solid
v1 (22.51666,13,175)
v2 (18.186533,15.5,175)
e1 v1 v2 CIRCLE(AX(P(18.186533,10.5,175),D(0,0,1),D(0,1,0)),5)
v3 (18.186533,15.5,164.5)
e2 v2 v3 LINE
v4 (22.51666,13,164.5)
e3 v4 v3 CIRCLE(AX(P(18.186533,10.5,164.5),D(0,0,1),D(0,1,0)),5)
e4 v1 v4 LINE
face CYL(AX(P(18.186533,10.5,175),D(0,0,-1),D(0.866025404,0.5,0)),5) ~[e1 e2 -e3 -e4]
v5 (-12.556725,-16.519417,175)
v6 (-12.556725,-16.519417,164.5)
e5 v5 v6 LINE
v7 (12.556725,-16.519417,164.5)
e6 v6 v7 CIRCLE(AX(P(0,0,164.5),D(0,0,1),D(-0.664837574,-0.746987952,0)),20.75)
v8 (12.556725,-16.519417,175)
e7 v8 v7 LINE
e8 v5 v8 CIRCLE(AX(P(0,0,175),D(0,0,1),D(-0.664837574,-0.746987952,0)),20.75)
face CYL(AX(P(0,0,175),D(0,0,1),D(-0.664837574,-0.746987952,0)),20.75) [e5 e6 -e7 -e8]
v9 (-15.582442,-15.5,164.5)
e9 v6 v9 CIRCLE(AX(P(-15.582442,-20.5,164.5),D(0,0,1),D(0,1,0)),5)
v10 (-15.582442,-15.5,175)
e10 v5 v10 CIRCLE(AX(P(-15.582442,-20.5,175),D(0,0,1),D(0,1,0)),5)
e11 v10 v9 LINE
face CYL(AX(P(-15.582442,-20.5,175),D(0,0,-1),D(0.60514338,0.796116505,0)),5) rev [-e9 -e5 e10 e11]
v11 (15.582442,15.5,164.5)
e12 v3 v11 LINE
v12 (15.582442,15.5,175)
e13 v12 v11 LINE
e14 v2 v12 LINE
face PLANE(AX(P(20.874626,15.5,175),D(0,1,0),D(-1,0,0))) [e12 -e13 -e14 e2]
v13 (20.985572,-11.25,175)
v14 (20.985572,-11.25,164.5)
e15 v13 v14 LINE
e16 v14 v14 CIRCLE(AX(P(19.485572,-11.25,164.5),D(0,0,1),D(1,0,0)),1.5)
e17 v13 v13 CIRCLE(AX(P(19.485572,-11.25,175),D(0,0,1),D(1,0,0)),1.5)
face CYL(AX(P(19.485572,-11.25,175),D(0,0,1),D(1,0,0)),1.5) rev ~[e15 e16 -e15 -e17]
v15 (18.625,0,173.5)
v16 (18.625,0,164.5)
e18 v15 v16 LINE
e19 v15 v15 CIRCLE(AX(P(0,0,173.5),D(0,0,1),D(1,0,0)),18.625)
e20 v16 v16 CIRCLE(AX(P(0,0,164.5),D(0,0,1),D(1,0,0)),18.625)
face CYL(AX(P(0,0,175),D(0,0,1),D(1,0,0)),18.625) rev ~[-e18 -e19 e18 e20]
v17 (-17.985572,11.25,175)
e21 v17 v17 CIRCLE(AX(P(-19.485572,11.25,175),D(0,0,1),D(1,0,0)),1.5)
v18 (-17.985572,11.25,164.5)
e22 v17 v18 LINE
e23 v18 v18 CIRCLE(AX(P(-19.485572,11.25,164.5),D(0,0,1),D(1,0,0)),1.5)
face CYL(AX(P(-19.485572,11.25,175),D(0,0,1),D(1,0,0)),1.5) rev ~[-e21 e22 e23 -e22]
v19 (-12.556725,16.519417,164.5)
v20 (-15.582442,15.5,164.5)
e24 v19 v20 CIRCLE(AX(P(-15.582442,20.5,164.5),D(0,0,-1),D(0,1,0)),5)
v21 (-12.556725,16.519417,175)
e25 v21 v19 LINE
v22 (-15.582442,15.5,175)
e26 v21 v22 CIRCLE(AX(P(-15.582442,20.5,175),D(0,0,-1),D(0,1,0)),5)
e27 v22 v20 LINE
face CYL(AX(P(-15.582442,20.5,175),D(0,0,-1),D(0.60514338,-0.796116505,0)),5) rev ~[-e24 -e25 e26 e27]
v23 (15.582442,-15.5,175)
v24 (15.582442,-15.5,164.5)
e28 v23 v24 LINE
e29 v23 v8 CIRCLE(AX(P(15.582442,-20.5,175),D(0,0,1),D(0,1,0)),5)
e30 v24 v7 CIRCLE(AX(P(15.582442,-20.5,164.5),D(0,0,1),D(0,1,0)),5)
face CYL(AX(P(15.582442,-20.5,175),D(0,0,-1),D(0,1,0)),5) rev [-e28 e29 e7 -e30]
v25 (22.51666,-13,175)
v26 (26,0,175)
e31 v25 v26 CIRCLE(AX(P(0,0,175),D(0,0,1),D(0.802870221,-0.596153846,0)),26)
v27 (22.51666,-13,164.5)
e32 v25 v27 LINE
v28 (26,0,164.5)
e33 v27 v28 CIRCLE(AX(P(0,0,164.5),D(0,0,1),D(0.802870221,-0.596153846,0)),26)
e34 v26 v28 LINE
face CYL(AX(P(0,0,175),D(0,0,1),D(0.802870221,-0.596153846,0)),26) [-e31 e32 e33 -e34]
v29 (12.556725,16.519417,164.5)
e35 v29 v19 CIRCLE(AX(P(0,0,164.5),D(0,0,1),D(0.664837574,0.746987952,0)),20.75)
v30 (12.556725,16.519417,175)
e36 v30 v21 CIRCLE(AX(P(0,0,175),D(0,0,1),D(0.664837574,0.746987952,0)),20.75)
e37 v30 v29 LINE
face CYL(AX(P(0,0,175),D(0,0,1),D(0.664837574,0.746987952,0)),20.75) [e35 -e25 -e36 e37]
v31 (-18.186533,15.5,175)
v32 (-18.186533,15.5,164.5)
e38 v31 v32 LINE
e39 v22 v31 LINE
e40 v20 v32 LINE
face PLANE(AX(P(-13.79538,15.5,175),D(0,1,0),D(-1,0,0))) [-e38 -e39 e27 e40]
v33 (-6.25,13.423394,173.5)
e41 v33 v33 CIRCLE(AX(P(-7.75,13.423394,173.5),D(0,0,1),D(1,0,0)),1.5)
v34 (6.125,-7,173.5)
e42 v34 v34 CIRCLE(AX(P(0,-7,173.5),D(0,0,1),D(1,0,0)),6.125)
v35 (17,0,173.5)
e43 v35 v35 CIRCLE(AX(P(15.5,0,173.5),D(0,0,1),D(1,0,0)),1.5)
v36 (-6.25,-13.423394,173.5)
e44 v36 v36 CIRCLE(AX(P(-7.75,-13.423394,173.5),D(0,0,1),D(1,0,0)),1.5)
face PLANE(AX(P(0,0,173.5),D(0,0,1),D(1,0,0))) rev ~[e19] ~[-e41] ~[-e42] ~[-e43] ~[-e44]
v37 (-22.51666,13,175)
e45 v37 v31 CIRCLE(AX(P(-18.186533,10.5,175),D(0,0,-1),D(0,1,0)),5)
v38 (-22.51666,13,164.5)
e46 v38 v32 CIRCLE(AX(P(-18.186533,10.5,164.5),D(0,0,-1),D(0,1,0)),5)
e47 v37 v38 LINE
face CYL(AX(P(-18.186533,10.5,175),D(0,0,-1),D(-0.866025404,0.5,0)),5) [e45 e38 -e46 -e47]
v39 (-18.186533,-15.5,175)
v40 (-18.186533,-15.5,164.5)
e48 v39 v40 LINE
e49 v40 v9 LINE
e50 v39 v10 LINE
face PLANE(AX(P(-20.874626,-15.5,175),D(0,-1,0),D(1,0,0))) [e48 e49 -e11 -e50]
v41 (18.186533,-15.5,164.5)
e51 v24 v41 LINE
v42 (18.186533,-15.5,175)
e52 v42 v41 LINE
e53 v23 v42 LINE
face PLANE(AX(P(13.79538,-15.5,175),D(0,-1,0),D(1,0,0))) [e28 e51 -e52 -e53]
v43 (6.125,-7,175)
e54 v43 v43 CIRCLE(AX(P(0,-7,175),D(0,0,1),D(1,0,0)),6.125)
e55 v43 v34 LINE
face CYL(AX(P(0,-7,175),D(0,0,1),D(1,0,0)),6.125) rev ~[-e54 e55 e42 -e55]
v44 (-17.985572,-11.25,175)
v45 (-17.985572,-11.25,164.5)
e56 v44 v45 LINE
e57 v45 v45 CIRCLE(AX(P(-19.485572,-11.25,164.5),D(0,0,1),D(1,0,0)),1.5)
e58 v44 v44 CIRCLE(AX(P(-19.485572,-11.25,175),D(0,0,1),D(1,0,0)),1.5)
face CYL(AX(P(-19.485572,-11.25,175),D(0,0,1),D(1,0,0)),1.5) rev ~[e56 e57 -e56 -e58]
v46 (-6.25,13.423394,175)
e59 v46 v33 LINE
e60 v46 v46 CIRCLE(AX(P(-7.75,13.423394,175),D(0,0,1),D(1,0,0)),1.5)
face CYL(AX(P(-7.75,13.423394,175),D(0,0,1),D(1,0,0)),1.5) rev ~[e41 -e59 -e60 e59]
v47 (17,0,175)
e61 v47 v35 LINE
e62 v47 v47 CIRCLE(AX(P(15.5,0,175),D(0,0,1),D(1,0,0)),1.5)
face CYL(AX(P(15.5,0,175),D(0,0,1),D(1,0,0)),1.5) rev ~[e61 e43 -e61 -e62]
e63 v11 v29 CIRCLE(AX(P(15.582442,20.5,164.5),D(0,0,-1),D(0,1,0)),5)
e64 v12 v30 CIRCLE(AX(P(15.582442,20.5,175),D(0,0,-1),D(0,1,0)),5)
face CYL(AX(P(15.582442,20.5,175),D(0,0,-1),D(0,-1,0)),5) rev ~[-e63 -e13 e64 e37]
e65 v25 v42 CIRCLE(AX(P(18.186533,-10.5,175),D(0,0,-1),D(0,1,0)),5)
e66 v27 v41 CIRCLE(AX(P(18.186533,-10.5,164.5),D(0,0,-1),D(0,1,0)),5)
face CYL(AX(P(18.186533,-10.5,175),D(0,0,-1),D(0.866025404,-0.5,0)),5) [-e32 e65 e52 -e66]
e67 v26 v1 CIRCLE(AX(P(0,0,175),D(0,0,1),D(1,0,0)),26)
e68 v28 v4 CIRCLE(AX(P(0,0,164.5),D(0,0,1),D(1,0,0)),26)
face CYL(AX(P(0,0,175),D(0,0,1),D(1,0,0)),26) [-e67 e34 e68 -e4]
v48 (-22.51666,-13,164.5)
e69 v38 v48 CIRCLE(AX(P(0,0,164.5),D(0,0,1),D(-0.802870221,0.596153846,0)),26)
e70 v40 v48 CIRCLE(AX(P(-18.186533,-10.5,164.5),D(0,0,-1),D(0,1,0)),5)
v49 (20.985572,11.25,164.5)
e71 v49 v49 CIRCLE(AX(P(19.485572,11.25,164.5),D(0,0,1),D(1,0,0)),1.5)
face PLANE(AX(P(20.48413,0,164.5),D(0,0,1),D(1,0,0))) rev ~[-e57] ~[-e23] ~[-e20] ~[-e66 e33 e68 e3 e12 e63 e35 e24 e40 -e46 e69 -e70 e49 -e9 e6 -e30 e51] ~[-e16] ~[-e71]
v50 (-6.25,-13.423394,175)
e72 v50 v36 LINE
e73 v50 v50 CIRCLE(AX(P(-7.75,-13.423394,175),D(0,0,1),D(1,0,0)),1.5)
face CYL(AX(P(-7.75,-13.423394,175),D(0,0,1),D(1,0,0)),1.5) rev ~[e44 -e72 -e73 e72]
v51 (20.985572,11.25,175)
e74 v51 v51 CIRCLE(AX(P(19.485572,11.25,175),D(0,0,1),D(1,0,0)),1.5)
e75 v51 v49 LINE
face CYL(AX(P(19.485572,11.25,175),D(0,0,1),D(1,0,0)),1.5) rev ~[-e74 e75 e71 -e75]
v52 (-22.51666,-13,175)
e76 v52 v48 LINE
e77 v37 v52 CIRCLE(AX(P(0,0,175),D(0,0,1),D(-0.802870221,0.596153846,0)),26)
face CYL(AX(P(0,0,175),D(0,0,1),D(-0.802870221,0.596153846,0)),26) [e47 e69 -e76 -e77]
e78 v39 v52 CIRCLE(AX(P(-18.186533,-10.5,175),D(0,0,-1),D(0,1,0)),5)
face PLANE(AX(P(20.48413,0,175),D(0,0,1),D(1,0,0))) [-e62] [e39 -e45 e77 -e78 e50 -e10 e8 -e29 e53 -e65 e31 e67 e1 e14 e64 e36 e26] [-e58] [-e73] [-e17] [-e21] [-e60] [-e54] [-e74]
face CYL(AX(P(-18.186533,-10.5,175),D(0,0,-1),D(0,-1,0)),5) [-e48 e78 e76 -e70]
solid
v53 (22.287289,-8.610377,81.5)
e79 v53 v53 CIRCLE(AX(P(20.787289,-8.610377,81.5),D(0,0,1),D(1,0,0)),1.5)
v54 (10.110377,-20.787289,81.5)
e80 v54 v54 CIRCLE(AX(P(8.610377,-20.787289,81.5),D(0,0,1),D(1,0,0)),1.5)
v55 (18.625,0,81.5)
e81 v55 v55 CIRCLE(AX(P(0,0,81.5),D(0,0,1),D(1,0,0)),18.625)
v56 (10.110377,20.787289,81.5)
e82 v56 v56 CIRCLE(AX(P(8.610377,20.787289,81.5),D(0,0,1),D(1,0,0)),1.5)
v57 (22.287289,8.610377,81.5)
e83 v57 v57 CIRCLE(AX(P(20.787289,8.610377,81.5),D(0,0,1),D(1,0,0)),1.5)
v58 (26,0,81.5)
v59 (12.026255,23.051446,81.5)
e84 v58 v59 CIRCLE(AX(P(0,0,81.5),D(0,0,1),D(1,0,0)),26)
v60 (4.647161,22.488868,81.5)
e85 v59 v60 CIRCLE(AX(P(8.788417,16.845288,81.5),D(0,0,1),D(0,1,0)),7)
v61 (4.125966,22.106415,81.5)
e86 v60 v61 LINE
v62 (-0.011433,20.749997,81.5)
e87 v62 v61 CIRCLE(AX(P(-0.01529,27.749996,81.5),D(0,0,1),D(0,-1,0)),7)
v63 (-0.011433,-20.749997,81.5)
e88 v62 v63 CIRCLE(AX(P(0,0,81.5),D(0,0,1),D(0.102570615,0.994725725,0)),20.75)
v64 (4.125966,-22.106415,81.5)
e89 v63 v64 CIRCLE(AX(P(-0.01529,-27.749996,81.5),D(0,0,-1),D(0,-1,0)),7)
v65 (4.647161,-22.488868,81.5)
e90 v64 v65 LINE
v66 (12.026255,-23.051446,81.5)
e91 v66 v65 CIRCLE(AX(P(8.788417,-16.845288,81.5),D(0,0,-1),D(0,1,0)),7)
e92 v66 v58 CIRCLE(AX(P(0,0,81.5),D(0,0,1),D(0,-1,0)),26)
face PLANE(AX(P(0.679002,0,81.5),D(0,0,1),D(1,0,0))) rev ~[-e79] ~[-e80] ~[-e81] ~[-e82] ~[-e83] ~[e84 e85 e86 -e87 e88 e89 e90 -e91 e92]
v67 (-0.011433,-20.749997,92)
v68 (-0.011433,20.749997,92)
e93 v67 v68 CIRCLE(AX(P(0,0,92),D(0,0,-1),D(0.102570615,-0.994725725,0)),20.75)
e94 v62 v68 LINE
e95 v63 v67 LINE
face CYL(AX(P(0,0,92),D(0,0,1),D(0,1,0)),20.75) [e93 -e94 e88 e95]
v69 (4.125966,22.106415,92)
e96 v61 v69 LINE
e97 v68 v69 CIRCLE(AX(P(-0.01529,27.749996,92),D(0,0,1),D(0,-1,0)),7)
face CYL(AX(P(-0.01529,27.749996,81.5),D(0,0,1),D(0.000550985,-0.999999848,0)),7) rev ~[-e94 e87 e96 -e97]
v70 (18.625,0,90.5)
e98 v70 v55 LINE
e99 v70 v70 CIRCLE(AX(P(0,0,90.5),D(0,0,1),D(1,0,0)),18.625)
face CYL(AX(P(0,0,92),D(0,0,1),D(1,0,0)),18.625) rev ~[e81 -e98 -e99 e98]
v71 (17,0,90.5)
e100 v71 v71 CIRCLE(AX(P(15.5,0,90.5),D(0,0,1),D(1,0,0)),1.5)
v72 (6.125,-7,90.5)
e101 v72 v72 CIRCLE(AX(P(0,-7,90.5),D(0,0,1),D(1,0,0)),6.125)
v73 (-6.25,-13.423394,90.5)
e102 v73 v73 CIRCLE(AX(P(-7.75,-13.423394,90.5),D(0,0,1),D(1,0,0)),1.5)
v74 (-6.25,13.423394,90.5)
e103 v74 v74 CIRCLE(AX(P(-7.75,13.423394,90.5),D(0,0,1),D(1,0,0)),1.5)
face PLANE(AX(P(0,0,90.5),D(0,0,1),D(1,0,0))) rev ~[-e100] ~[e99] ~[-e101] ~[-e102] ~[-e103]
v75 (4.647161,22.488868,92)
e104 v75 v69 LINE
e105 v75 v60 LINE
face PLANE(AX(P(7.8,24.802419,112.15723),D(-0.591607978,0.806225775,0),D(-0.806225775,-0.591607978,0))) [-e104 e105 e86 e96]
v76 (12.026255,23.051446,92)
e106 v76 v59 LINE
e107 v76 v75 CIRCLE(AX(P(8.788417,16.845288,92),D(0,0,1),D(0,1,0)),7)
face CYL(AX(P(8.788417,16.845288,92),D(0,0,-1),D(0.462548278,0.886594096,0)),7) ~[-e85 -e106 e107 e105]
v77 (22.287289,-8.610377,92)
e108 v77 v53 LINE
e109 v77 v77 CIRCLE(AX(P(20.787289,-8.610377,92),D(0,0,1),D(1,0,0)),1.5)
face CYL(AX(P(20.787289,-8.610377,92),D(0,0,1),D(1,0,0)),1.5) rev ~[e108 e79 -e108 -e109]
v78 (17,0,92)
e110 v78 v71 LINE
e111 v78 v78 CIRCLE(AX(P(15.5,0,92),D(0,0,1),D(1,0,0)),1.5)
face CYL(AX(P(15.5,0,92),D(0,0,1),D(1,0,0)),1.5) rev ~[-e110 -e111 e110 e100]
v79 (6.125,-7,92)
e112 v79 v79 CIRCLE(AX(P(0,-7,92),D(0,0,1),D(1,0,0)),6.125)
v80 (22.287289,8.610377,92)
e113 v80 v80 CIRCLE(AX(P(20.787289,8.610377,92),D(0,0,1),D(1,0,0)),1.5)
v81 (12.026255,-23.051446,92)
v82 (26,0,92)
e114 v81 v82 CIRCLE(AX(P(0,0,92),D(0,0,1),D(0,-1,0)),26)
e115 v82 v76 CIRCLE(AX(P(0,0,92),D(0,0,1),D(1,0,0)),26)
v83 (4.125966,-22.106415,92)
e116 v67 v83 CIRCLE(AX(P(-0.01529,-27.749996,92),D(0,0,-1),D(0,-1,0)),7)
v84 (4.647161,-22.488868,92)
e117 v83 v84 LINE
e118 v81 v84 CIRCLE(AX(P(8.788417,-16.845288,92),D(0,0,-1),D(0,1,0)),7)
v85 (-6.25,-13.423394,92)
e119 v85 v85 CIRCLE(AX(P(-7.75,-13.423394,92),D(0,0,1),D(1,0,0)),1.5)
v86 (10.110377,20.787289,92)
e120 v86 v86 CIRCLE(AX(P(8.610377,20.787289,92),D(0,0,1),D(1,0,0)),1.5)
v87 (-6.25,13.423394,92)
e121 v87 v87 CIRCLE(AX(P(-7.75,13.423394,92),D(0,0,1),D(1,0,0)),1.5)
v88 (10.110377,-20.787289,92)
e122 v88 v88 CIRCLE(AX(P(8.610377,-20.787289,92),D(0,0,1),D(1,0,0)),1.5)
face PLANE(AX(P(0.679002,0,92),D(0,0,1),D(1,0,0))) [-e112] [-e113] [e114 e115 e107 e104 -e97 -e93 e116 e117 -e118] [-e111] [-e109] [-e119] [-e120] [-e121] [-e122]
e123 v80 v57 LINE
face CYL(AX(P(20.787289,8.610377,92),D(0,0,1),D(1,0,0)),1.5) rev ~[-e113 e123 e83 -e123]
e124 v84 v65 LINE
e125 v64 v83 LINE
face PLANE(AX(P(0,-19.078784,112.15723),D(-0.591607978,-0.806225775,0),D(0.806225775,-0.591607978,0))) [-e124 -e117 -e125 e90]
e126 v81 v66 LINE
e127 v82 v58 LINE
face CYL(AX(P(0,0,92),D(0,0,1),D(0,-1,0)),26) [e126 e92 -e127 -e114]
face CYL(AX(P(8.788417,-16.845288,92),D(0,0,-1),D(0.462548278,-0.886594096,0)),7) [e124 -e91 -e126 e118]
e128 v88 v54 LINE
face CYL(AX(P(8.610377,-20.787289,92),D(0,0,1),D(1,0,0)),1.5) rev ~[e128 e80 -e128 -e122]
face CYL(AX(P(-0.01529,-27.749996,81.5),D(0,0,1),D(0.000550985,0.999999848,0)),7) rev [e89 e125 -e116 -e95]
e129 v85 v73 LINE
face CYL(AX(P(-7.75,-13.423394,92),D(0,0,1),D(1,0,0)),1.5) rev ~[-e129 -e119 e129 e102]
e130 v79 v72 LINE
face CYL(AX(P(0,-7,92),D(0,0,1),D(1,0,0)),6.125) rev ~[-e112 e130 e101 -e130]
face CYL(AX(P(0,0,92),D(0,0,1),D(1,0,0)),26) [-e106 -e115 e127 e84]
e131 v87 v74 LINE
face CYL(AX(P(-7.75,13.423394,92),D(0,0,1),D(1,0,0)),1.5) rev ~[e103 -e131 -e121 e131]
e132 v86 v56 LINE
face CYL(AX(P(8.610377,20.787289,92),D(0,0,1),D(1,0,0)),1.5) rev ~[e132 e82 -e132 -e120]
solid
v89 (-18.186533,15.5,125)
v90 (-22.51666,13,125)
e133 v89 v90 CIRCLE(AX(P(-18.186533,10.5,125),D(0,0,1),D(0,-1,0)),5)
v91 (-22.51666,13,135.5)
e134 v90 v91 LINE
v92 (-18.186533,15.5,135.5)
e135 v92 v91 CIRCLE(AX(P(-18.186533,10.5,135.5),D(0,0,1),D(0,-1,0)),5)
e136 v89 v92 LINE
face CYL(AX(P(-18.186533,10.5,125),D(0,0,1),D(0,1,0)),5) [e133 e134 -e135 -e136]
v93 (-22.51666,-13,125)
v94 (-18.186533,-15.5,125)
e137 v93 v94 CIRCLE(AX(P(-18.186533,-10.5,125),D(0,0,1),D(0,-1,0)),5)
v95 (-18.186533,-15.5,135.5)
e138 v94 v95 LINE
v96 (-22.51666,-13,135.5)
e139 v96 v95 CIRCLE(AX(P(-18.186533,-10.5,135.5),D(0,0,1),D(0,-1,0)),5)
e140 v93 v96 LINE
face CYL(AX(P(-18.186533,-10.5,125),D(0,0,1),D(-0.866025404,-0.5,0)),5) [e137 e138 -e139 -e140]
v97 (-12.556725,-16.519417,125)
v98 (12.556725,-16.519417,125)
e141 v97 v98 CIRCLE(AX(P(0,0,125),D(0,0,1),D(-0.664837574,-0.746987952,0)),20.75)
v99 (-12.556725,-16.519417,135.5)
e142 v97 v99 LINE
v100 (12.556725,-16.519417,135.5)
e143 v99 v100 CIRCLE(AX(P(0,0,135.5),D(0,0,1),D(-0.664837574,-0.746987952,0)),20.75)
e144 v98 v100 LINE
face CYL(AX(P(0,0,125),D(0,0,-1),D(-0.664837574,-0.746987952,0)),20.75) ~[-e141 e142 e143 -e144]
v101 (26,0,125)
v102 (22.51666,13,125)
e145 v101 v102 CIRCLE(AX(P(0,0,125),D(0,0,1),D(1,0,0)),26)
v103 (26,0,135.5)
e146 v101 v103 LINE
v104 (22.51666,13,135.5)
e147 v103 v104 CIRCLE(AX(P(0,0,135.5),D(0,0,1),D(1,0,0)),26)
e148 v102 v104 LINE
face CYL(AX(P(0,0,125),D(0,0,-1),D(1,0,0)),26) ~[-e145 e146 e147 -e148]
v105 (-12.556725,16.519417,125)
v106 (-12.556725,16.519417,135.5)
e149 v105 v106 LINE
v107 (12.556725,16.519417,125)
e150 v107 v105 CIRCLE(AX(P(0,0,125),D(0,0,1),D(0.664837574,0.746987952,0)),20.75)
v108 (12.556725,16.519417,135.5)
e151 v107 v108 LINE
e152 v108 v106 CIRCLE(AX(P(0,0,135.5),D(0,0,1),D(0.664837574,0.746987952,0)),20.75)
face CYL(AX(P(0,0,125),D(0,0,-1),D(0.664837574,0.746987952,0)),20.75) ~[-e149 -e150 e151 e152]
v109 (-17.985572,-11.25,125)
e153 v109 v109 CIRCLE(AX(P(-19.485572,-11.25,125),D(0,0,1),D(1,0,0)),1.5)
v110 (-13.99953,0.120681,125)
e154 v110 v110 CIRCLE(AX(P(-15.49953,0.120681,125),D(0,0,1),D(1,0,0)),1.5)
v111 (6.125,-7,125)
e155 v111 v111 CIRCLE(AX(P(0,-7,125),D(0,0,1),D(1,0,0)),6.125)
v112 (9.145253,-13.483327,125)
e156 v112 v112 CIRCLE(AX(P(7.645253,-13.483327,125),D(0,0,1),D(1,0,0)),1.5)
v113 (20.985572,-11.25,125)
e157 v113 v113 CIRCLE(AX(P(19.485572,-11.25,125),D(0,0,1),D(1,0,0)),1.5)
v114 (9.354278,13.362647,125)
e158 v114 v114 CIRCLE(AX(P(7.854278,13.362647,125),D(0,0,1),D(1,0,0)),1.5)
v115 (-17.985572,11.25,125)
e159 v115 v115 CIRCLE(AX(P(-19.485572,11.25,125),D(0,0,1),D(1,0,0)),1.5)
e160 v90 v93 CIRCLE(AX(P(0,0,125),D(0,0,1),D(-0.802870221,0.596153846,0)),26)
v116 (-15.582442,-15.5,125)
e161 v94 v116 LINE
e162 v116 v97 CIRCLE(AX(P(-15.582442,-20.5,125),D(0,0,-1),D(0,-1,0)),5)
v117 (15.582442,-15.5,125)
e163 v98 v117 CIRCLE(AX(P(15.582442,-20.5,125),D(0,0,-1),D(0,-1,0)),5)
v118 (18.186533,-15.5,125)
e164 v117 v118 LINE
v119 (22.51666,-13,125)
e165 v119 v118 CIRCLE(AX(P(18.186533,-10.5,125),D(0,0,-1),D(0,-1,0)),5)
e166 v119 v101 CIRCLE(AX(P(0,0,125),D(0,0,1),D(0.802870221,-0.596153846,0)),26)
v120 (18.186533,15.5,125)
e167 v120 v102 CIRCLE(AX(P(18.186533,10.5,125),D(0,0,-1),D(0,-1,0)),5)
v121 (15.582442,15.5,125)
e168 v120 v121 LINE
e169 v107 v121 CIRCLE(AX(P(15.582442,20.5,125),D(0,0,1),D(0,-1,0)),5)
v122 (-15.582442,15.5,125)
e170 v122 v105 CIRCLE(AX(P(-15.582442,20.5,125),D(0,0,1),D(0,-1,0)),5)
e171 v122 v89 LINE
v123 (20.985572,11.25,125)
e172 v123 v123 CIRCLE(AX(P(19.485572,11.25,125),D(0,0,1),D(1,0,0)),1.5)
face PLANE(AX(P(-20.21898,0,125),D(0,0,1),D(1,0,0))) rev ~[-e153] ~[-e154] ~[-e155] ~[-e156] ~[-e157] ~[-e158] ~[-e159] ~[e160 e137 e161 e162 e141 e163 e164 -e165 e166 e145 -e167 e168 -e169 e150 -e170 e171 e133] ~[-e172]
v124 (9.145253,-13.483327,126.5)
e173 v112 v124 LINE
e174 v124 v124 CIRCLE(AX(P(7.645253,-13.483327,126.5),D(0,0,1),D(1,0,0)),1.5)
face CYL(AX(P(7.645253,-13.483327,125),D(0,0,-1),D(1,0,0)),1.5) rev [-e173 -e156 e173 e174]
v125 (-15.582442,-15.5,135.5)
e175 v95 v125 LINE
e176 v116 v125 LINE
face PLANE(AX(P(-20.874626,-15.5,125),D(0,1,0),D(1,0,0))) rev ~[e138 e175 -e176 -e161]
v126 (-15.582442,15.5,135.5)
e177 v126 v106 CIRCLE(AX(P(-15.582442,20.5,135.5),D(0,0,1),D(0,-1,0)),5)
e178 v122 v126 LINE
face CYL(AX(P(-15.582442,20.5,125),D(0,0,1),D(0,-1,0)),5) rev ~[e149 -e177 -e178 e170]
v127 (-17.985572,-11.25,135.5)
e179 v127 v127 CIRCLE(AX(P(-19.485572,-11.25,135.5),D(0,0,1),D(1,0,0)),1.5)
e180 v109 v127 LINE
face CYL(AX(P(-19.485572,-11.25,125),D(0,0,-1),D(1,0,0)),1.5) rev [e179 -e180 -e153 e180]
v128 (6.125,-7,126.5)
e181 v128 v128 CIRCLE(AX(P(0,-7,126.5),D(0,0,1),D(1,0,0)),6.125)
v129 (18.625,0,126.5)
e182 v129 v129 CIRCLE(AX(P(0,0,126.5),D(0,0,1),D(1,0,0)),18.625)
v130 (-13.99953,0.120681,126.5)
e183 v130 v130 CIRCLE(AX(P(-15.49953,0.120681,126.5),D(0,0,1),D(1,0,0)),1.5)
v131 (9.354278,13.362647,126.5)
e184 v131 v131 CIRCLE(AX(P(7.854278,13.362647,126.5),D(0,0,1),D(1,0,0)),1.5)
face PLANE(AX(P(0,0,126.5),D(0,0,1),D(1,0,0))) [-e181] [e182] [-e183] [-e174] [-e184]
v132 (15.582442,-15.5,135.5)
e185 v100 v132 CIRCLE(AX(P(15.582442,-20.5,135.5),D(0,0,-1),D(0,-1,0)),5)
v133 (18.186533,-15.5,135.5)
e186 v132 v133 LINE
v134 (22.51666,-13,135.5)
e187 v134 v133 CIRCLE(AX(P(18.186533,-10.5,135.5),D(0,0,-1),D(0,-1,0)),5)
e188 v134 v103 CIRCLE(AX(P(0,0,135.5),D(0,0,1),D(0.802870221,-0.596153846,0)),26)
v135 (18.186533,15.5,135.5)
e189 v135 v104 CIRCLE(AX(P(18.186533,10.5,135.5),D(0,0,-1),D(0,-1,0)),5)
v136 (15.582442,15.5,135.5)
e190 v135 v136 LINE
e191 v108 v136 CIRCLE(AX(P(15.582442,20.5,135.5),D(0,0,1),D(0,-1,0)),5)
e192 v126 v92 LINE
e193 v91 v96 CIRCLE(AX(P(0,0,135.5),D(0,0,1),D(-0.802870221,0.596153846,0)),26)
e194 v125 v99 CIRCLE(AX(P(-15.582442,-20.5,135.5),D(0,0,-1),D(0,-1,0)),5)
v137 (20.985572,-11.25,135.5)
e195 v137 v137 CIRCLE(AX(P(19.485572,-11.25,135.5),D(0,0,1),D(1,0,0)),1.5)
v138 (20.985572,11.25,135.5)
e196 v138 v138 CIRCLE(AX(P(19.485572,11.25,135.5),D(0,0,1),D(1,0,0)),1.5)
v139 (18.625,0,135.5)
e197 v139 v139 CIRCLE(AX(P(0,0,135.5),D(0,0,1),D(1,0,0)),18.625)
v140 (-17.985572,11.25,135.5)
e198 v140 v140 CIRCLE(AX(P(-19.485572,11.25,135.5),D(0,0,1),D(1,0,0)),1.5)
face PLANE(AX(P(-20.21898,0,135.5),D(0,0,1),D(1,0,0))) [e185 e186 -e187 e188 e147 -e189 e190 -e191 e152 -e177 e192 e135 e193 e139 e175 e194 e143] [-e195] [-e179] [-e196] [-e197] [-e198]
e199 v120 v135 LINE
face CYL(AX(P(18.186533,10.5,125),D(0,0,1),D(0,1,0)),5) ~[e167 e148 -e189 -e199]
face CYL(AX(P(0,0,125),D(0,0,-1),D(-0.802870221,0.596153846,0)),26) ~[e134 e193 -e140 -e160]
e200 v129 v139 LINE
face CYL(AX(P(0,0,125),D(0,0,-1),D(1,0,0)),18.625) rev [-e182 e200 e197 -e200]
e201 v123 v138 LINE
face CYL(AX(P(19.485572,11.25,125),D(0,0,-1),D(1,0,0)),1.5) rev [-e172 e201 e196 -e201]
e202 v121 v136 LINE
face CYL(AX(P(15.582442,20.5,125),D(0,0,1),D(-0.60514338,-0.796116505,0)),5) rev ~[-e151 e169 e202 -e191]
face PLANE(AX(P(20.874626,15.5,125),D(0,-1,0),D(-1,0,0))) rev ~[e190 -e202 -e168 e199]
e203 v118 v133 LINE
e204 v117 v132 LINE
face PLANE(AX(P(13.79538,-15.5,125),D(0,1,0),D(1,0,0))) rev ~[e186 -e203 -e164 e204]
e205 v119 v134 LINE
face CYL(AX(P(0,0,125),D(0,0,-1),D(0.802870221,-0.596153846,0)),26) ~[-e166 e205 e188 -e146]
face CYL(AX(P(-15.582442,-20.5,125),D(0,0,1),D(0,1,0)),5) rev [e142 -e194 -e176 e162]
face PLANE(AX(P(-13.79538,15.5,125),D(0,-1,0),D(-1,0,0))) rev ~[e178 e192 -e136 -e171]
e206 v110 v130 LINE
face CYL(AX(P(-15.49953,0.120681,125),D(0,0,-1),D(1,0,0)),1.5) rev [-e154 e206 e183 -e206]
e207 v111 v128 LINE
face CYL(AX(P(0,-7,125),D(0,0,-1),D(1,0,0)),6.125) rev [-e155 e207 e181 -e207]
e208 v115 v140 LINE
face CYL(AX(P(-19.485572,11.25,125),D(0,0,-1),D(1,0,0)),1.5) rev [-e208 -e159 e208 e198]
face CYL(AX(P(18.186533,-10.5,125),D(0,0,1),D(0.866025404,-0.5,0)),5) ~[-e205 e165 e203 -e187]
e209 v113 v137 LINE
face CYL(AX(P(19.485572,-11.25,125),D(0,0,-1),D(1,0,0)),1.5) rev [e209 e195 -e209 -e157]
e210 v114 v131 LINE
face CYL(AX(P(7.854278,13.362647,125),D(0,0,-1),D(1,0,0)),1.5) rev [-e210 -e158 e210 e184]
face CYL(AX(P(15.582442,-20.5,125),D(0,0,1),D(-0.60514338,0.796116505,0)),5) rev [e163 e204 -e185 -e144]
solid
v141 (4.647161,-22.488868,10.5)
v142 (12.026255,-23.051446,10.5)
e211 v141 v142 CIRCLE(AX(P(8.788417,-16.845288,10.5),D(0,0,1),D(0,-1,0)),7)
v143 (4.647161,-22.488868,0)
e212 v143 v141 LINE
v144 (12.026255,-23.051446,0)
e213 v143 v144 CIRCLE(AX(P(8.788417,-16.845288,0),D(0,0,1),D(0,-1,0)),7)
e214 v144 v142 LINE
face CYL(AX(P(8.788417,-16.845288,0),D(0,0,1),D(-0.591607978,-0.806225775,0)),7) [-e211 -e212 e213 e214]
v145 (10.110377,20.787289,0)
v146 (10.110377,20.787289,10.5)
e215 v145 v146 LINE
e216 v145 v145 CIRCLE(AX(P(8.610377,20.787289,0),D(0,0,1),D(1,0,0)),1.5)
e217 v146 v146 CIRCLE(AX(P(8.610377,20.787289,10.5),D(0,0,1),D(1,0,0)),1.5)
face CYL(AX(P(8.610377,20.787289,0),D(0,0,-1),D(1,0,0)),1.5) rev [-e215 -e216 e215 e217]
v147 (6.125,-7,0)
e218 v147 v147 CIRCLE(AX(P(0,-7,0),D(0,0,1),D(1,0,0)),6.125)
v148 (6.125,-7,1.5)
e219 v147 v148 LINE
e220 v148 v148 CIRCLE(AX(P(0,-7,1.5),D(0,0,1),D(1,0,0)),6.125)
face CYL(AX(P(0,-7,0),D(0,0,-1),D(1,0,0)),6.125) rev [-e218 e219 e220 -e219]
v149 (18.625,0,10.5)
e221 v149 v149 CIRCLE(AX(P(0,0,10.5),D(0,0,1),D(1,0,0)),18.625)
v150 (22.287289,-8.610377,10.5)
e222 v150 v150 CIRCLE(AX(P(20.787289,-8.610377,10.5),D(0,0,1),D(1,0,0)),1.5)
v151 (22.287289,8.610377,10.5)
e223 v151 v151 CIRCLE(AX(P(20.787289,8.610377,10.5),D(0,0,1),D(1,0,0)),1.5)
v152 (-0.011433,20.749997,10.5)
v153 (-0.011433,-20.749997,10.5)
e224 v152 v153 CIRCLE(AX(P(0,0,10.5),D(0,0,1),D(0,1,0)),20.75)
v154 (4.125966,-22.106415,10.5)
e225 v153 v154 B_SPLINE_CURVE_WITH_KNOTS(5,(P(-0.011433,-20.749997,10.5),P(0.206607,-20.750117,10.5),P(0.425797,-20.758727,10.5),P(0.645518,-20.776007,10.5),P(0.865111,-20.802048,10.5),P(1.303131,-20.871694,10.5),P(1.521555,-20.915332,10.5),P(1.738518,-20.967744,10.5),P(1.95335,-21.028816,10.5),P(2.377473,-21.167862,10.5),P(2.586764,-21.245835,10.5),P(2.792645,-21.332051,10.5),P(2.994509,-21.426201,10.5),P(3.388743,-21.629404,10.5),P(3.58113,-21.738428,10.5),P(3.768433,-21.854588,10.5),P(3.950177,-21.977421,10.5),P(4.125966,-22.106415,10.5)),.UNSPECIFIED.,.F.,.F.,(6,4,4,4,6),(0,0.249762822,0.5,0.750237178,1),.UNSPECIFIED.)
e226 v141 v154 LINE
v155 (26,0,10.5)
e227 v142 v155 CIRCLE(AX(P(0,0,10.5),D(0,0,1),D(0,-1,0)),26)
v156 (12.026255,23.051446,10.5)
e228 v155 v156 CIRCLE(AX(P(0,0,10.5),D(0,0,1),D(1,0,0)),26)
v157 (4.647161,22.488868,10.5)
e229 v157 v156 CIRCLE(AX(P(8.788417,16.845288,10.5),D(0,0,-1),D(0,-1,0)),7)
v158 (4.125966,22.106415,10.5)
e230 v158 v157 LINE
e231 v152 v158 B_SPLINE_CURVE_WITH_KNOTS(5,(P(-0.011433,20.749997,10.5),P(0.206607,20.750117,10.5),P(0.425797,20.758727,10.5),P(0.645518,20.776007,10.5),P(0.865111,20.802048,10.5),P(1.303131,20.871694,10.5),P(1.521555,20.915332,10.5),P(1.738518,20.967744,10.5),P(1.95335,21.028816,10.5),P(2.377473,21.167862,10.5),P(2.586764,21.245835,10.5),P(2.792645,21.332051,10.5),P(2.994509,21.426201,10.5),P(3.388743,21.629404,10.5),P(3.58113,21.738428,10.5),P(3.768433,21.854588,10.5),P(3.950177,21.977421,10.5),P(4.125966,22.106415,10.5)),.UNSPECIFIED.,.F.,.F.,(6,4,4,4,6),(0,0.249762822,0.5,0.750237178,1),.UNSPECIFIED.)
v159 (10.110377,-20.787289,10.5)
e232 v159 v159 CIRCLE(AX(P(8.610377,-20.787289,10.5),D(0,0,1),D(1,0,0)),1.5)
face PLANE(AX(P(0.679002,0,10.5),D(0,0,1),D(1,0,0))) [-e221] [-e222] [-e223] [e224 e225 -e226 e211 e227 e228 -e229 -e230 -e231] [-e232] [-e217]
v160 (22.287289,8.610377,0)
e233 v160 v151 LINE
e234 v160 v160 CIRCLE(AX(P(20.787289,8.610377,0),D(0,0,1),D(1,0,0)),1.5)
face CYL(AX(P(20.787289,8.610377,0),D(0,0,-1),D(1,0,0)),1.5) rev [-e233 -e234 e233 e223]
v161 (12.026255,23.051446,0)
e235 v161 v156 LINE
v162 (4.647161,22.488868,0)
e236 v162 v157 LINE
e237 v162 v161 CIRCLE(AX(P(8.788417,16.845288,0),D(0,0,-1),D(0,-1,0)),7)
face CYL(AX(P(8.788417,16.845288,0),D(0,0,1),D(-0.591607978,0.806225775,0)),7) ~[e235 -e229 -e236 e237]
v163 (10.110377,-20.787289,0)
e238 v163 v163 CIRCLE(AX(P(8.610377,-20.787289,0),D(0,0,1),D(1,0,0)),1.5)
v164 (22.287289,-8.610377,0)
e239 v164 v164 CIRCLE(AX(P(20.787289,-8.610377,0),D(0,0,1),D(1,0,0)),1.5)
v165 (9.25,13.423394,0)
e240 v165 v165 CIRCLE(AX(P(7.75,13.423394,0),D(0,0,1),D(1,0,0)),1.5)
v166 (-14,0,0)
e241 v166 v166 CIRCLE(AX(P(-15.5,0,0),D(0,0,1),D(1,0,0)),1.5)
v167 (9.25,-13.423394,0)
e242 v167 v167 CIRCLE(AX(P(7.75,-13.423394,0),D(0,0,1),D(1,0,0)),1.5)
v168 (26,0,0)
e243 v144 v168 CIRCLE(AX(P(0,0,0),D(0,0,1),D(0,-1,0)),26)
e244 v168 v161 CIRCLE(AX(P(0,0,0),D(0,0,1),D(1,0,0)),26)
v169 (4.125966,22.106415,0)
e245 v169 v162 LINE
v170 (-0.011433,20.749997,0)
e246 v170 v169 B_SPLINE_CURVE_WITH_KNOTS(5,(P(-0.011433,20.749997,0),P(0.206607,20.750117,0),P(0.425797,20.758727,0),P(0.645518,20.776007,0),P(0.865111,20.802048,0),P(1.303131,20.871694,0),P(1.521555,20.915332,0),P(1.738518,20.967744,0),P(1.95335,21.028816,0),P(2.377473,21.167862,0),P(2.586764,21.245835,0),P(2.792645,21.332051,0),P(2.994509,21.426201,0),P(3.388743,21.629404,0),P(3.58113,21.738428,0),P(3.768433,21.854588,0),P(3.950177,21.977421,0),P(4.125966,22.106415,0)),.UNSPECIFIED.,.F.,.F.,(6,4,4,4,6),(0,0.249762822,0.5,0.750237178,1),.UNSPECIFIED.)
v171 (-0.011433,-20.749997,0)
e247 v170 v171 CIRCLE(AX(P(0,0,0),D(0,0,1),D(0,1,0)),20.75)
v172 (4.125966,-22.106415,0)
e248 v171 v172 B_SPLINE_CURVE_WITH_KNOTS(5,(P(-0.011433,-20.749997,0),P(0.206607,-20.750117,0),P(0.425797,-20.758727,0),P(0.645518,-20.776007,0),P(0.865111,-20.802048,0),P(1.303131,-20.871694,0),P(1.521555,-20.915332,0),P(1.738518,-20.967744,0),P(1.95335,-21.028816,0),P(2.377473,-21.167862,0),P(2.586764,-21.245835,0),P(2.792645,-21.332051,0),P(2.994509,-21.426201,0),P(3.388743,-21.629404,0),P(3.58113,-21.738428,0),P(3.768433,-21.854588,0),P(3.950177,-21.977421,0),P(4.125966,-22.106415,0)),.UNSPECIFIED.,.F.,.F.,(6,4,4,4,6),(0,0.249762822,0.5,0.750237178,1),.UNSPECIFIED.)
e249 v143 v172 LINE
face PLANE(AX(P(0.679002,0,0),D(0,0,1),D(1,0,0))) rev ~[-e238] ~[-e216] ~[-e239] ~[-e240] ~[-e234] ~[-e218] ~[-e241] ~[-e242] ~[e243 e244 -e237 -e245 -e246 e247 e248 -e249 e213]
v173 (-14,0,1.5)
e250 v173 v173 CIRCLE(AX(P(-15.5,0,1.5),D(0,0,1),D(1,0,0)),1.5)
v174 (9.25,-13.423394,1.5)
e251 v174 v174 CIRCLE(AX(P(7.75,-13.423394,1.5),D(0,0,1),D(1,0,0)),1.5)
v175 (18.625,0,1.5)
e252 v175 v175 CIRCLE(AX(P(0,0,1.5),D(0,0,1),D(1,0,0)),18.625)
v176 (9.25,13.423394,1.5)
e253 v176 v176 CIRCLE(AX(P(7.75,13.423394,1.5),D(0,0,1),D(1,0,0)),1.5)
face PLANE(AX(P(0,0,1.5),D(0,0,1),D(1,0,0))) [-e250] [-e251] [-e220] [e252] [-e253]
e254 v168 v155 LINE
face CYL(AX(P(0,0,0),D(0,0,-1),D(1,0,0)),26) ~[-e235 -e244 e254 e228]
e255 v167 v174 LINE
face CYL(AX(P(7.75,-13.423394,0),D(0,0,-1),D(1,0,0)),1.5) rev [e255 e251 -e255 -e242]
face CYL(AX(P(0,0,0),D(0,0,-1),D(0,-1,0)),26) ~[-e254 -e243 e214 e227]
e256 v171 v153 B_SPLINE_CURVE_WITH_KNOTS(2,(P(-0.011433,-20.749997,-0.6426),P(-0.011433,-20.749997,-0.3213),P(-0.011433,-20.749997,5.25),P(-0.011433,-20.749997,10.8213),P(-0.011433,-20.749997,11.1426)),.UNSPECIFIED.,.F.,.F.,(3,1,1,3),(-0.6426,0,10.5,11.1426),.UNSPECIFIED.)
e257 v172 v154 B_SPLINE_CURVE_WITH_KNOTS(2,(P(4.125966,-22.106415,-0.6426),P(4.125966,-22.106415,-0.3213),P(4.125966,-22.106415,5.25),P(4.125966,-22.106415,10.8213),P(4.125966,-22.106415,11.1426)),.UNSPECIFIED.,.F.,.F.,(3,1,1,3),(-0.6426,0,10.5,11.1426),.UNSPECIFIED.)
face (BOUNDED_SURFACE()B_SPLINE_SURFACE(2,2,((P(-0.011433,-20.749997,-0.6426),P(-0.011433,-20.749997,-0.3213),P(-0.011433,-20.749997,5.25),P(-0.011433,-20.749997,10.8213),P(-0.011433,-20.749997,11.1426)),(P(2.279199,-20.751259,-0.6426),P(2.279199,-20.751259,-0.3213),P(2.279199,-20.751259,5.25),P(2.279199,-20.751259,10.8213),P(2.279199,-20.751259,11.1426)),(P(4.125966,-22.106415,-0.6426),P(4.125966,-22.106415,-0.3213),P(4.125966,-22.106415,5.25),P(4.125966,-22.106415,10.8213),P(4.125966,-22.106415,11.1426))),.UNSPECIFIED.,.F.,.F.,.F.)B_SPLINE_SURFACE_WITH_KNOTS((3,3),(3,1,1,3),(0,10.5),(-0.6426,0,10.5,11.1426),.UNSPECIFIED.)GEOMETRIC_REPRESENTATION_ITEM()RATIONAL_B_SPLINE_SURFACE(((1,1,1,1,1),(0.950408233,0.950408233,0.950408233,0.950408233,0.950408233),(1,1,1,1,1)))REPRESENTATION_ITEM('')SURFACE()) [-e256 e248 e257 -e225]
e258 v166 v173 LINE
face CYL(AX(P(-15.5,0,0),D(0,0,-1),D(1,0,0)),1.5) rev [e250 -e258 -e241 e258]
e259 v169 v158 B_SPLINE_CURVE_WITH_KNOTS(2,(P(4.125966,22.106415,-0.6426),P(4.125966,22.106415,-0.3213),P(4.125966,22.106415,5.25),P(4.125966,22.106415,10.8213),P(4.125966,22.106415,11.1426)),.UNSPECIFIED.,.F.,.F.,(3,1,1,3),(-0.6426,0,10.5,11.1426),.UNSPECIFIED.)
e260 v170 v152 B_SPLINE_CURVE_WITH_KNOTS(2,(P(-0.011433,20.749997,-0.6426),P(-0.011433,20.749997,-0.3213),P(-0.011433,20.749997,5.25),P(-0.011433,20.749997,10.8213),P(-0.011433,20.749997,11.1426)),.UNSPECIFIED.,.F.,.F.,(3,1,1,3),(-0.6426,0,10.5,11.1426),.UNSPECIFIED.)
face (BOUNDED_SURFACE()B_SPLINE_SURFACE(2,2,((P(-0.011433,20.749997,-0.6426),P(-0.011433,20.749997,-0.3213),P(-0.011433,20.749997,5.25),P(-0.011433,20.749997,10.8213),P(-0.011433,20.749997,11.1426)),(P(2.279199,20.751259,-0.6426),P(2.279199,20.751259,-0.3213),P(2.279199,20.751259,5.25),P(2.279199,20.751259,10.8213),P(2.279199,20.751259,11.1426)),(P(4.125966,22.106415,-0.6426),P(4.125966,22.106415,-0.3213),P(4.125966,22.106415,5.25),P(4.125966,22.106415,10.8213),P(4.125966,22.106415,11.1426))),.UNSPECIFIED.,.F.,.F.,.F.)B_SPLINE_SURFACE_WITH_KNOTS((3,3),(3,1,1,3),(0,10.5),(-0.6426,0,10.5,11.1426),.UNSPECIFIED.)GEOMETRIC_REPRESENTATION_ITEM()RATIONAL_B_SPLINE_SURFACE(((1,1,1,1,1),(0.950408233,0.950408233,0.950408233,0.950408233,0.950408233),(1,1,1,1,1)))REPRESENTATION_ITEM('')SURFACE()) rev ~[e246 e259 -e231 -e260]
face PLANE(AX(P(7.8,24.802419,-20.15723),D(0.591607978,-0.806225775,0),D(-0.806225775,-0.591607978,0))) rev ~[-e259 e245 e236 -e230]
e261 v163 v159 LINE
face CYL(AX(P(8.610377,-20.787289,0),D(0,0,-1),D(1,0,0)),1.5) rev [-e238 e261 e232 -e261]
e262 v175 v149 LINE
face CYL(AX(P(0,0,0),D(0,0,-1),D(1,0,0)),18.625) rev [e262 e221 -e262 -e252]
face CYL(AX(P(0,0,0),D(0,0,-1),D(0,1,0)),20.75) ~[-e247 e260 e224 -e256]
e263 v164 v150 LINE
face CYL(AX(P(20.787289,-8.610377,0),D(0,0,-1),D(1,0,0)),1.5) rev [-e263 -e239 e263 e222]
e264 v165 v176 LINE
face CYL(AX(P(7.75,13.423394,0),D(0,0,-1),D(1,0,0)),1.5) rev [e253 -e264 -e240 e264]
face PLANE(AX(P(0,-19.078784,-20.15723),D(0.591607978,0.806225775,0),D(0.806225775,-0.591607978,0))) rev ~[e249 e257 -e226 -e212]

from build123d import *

# Parameters (mm, degrees)
F1_R           = 18.625
F1_R_2         = 1.5
F1_R_3         = 6.125
F3_DEPTH       = 1.5
F2_R           = 18.625
F2_R_2         = 1.5
F2_R_3         = 6.125
F4_DEPTH       = 1.5
F5_DEPTH       = 10.5
F6_DEPTH       = 10.5
F7_T4_DEPTH    = 50.8144607383
F7_S5_R        = 20.75
F7_T6_DEPTH    = 27
F7_T10_DEPTH   = 50.8144607383
F7_S11_R       = 20.75
F7_T12_DEPTH   = 27
F7_2_T4_DEPTH  = 50.8144607383
F7_2_S5_R      = 20.75
F7_2_T6_DEPTH  = 27
F7_2_T10_DEPTH = 50.8144607383
F7_2_S11_R     = 20.75
F7_2_T12_DEPTH = 27
F8_R           = 7
F8_2_R         = 7
F11_R          = 18.625
F11_R_2        = 1.5
F11_R_3        = 6.125
F13_DEPTH      = 1.5
F14_DEPTH      = 10.5
F12_R          = 18.625
F12_R_2        = 1.5
F12_R_3        = 6.125
F15_DEPTH      = 1.5
F16_DEPTH      = 10.5
F17_R          = 5
F17_2_R        = 5


# Not quite as in the source:
# - a fillet or chamfer that OpenCascade refuses, or shapes differently, is made with other operations: its cross-section is extruded or revolved along the edge and cut away or added


with BuildPart() as f3:
    # F1 (on Top) → F3 (new body)
    with BuildSketch(Plane.XY):
        Circle(F1_R)
        with Locations((7.75, -13.4233937587)):
            Circle(F1_R_2, mode=Mode.SUBTRACT)
        with Locations((0, -7)):
            Circle(F1_R_3, mode=Mode.SUBTRACT)
        with Locations((-15.5, 0)):
            Circle(F1_R_2, mode=Mode.SUBTRACT)
        with Locations((7.75, 13.4233937587)):
            Circle(F1_R_2, mode=Mode.SUBTRACT)
    extrude(amount=F3_DEPTH)

    # F1 (on Top) → F5 (join)
    with BuildSketch(Plane.XY):
        with BuildLine():
            ThreePointArc((20.75, 0), (14.6724657096, 14.6724657096), (0, 20.75))
            ThreePointArc((0, 20.75), (-20.75, 0), (0, -20.75))
            ThreePointArc((0, -20.75), (14.6724657096, -14.6724657096), (20.75, 0))
        make_face()
        Circle(F1_R, mode=Mode.SUBTRACT)
        with BuildLine():
            ThreePointArc((0, -26), (18.3847763109, -18.3847763109), (26, 0))
            ThreePointArc((26, 0), (18.3847763109, 18.3847763109), (0, 26))
            Line((0, 26), (0, 20.75))
            ThreePointArc((0, 20.75), (14.6724657096, 14.6724657096), (20.75, 0))
            ThreePointArc((20.75, 0), (14.6724657096, -14.6724657096), (0, -20.75))
            Line((0, -20.75), (0, -26))
        make_face()
        with Locations((8.6103772282, -20.7872894815)):
            Circle(F1_R_2, mode=Mode.SUBTRACT)
        with Locations((20.7872894815, -8.6103772282)):
            Circle(F1_R_2, mode=Mode.SUBTRACT)
        with Locations((20.7872894815, 8.6103772282)):
            Circle(F1_R_2, mode=Mode.SUBTRACT)
        with Locations((8.6103772282, 20.7872894815)):
            Circle(F1_R_2, mode=Mode.SUBTRACT)
    extrude(amount=F5_DEPTH)

    # F7: chamfer of 6 on 2 edges, made by hand


with BuildPart() as f4:
    # F2 (on offset) → F4 (new body)
    with BuildSketch(Plane.XY.offset(92)):
        Circle(F2_R)
        with Locations((-7.75, -13.4233937587)):
            Circle(F2_R_2, mode=Mode.SUBTRACT)
        with Locations((0, -7)):
            Circle(F2_R_3, mode=Mode.SUBTRACT)
        with Locations((-7.75, 13.4233937587)):
            Circle(F2_R_2, mode=Mode.SUBTRACT)
        with Locations((15.5, 0)):
            Circle(F2_R_2, mode=Mode.SUBTRACT)
    extrude(amount=-F4_DEPTH)

    # F2 (on offset) → F6 (join)
    with BuildSketch(Plane.XY.offset(92)):
        with BuildLine():
            ThreePointArc((20.75, 0), (14.6724657096, 14.6724657096), (0, 20.75))
            ThreePointArc((0, 20.75), (-20.75, 0), (0, -20.75))
            ThreePointArc((0, -20.75), (14.6724657096, -14.6724657096), (20.75, 0))
        make_face()
        Circle(F2_R, mode=Mode.SUBTRACT)
        with BuildLine():
            ThreePointArc((0, -26), (18.3847763109, -18.3847763109), (26, 0))
            ThreePointArc((26, 0), (18.3847763109, 18.3847763109), (0, 26))
            Line((0, 26), (0, 20.75))
            ThreePointArc((0, 20.75), (14.6724657096, 14.6724657096), (20.75, 0))
            ThreePointArc((20.75, 0), (14.6724657096, -14.6724657096), (0, -20.75))
            Line((0, -20.75), (0, -26))
        make_face()
        with Locations((8.6103772282, -20.7872894815)):
            Circle(F2_R_2, mode=Mode.SUBTRACT)
        with Locations((20.7872894815, -8.6103772282)):
            Circle(F2_R_2, mode=Mode.SUBTRACT)
        with Locations((20.7872894815, 8.6103772282)):
            Circle(F2_R_2, mode=Mode.SUBTRACT)
        with Locations((8.6103772282, 20.7872894815)):
            Circle(F2_R_2, mode=Mode.SUBTRACT)
    extrude(amount=-F6_DEPTH)

    # F7#2: chamfer of 6 on 2 edges, made by hand


with BuildPart() as f7_tool2:
    # F7_s3 → F7_t4 (new body)
    with BuildSketch(Plane.XY.offset(-20.1572303692)):
        with BuildLine():
            Line((7.8, 24.8024192368), (0, 19.0787840283))
            Line((0, 19.0787840283), (0, 26))
            ThreePointArc((0, 26), (4.0302519246, 25.6857366923), (7.8, 24.8024192368))
        make_face()
    extrude(amount=F7_T4_DEPTH)

    # F7_s5 → F7_t6 (cut, symmetric)
    with BuildSketch(Plane.XY.offset(5.3)):
        Circle(F7_S5_R)
    extrude(amount=F7_T6_DEPTH, both=True, mode=Mode.SUBTRACT)


with BuildPart() as f3_1:
    add(f3.part)

    # F7_t1: cut F7_tool2
    add(f7_tool2.part, mode=Mode.SUBTRACT)


with BuildPart() as f7_tool8:
    # F7_s9 → F7_t10 (new body)
    with BuildSketch(Plane.XY.offset(-20.1572303692)):
        with BuildLine():
            Line((0, -19.0787840283), (7.8, -24.8024192368))
            ThreePointArc((7.8, -24.8024192368), (4.0302519246, -25.6857366923), (0, -26))
            Line((0, -26), (0, -19.0787840283))
        make_face()
    extrude(amount=F7_T10_DEPTH)

    # F7_s11 → F7_t12 (cut, symmetric)
    with BuildSketch(Plane.XY.offset(5.3)):
        Circle(F7_S11_R)
    extrude(amount=F7_T12_DEPTH, both=True, mode=Mode.SUBTRACT)


with BuildPart() as f3_2:
    add(f3_1.part)

    # F7_t7: cut F7_tool8
    add(f7_tool8.part, mode=Mode.SUBTRACT)

    # F8
    f8_edges = [f3_2.edges().sort_by_distance(p)[0] for p in [
        (2.12834, -20.640559, 5.25),
        (2.12834, 20.640559, 5.25),
        (7.8, 24.802419, 5.25),
        (7.8, -24.802419, 5.25),
    ]]
    fillet(f8_edges, radius=F8_R)


with BuildPart() as f7_2_tool2:
    # F7_2_s3 → F7_2_t4 (new body)
    with BuildSketch(Plane.XY.offset(112.1572303692)):
        with BuildLine():
            Line((7.8, 24.8024192368), (0, 19.0787840283))
            Line((0, 19.0787840283), (0, 26))
            ThreePointArc((0, 26), (4.0302519246, 25.6857366923), (7.8, 24.8024192368))
        make_face()
    extrude(amount=-F7_2_T4_DEPTH)

    # F7_2_s5 → F7_2_t6 (cut, symmetric)
    with BuildSketch(Plane.XY.offset(86.8)):
        Circle(F7_2_S5_R)
    extrude(amount=F7_2_T6_DEPTH, both=True, mode=Mode.SUBTRACT)


with BuildPart() as f4_1:
    add(f4.part)

    # F7_2_t1: cut F7_2_tool2
    add(f7_2_tool2.part, mode=Mode.SUBTRACT)


with BuildPart() as f7_2_tool8:
    # F7_2_s9 → F7_2_t10 (new body)
    with BuildSketch(Plane.XY.offset(112.1572303692)):
        with BuildLine():
            Line((0, -19.0787840283), (7.8, -24.8024192368))
            ThreePointArc((7.8, -24.8024192368), (4.0302519246, -25.6857366923), (0, -26))
            Line((0, -26), (0, -19.0787840283))
        make_face()
    extrude(amount=-F7_2_T10_DEPTH)

    # F7_2_s11 → F7_2_t12 (cut, symmetric)
    with BuildSketch(Plane.XY.offset(86.8)):
        Circle(F7_2_S11_R)
    extrude(amount=F7_2_T12_DEPTH, both=True, mode=Mode.SUBTRACT)


with BuildPart() as f4_2:
    add(f4_1.part)

    # F7_2_t7: cut F7_2_tool8
    add(f7_2_tool8.part, mode=Mode.SUBTRACT)

    # F8#2
    f8_2_edges = [f4_2.edges().sort_by_distance(p)[0] for p in [
        (7.8, -24.802419, 86.75),
        (2.12834, -20.640559, 86.75),
        (2.12834, 20.640559, 86.75),
        (7.8, 24.802419, 86.75),
    ]]
    fillet(f8_2_edges, radius=F8_2_R)


with BuildPart() as f13:
    # F11 (on offset) → F13 (new body)
    with BuildSketch(Plane.XY.offset(125)):
        Circle(F11_R)
        with Locations((7.6452526616, -13.4833271762)):
            Circle(F11_R_2, mode=Mode.SUBTRACT)
        with Locations((0, -7)):
            Circle(F11_R_3, mode=Mode.SUBTRACT)
        with Locations((-15.4995301929, 0.1206805648)):
            Circle(F11_R_2, mode=Mode.SUBTRACT)
        with Locations((7.8542775313, 13.3626466114)):
            Circle(F11_R_2, mode=Mode.SUBTRACT)
    extrude(amount=F13_DEPTH)

    # F11 (on offset) → F14 (join)
    with BuildSketch(Plane.XY.offset(125)):
        with BuildLine():
            Line((-13.7953796613, 15.5), (-20.8746257451, 15.5))
            ThreePointArc((-20.8746257451, 15.5), (-26, 0), (-20.8746257451, -15.5))
            Line((-20.8746257451, -15.5), (-13.7953796613, -15.5))
            ThreePointArc((-13.7953796613, -15.5), (-20.75, 0), (-13.7953796613, 15.5))
        make_face()
        with Locations((-19.4855715851, -11.25)):
            Circle(F11_R_2, mode=Mode.SUBTRACT)
        with Locations((-19.4855715851, 11.25)):
            Circle(F11_R_2, mode=Mode.SUBTRACT)
        with BuildLine():
            ThreePointArc((20.75, 0), (18.9316748859, 8.4943620133), (13.7953796613, 15.5))
            ThreePointArc((13.7953796613, 15.5), (0, 20.75), (-13.7953796613, 15.5))
            ThreePointArc((-13.7953796613, 15.5), (-20.75, 0), (-13.7953796613, -15.5))
            ThreePointArc((-13.7953796613, -15.5), (0, -20.75), (13.7953796613, -15.5))
            ThreePointArc((13.7953796613, -15.5), (18.9316748859, -8.4943620133), (20.75, 0))
        make_face()
        Circle(F11_R, mode=Mode.SUBTRACT)
        with BuildLine():
            ThreePointArc((20.8746257451, -15.5), (24.6854235266, -8.1627118847), (26, 0))
            ThreePointArc((26, 0), (24.6854235266, 8.1627118847), (20.8746257451, 15.5))
            Line((20.8746257451, 15.5), (13.7953796613, 15.5))
            ThreePointArc((13.7953796613, 15.5), (18.9316748859, 8.4943620133), (20.75, 0))
            ThreePointArc((20.75, 0), (18.9316748859, -8.4943620133), (13.7953796613, -15.5))
            Line((13.7953796613, -15.5), (20.8746257451, -15.5))
        make_face()
        with Locations((19.4855715851, -11.25)):
            Circle(F11_R_2, mode=Mode.SUBTRACT)
        with Locations((19.4855715851, 11.25)):
            Circle(F11_R_2, mode=Mode.SUBTRACT)
    extrude(amount=F14_DEPTH)

    # F17
    f17_edges = [f13.edges().sort_by_distance(p)[0] for p in [
        (13.79538, 15.5, 130.25),
        (13.79538, -15.5, 130.25),
        (-13.79538, -15.5, 130.25),
        (-13.79538, 15.5, 130.25),
        (-20.874626, -15.5, 130.25),
        (20.874626, -15.5, 130.25),
        (20.874626, 15.5, 130.25),
        (-20.874626, 15.5, 130.25),
    ]]
    fillet(f17_edges, radius=F17_R)


with BuildPart() as f15:
    # F12 (on offset) → F15 (new body)
    with BuildSketch(Plane.XY.offset(175)):
        Circle(F12_R)
        with Locations((-7.75, -13.4233937587)):
            Circle(F12_R_2, mode=Mode.SUBTRACT)
        with Locations((0, -7)):
            Circle(F12_R_3, mode=Mode.SUBTRACT)
        with Locations((-7.75, 13.4233937587)):
            Circle(F12_R_2, mode=Mode.SUBTRACT)
        with Locations((15.5, 0)):
            Circle(F12_R_2, mode=Mode.SUBTRACT)
    extrude(amount=-F15_DEPTH)

    # F12 (on offset) → F16 (join)
    with BuildSketch(Plane.XY.offset(175)):
        with BuildLine():
            ThreePointArc((20.8746257451, -15.5), (24.6854235266, -8.1627118847), (26, 0))
            ThreePointArc((26, 0), (24.6854235266, 8.1627118847), (20.8746257451, 15.5))
            Line((20.8746257451, 15.5), (13.7953796613, 15.5))
            ThreePointArc((13.7953796613, 15.5), (18.9316748859, 8.4943620133), (20.75, 0))
            ThreePointArc((20.75, 0), (18.9316748859, -8.4943620133), (13.7953796613, -15.5))
            Line((13.7953796613, -15.5), (20.8746257451, -15.5))
        make_face()
        with Locations((19.4855715851, -11.25)):
            Circle(F12_R_2, mode=Mode.SUBTRACT)
        with Locations((19.4855715851, 11.25)):
            Circle(F12_R_2, mode=Mode.SUBTRACT)
        with BuildLine():
            ThreePointArc((20.75, 0), (18.9316748859, 8.4943620133), (13.7953796613, 15.5))
            ThreePointArc((13.7953796613, 15.5), (0, 20.75), (-13.7953796613, 15.5))
            ThreePointArc((-13.7953796613, 15.5), (-20.75, 0), (-13.7953796613, -15.5))
            ThreePointArc((-13.7953796613, -15.5), (0, -20.75), (13.7953796613, -15.5))
            ThreePointArc((13.7953796613, -15.5), (18.9316748859, -8.4943620133), (20.75, 0))
        make_face()
        Circle(F12_R, mode=Mode.SUBTRACT)
        with BuildLine():
            Line((-13.7953796613, 15.5), (-20.8746257451, 15.5))
            ThreePointArc((-20.8746257451, 15.5), (-26, 0), (-20.8746257451, -15.5))
            Line((-20.8746257451, -15.5), (-13.7953796613, -15.5))
            ThreePointArc((-13.7953796613, -15.5), (-20.75, 0), (-13.7953796613, 15.5))
        make_face()
        with Locations((-19.4855715851, -11.25)):
            Circle(F12_R_2, mode=Mode.SUBTRACT)
        with Locations((-19.4855715851, 11.25)):
            Circle(F12_R_2, mode=Mode.SUBTRACT)
    extrude(amount=-F16_DEPTH)

    # F17#2
    f17_2_edges = [f15.edges().sort_by_distance(p)[0] for p in [
        (-13.79538, 15.5, 169.75),
        (-20.874626, 15.5, 169.75),
        (13.79538, 15.5, 169.75),
        (20.874626, 15.5, 169.75),
        (20.874626, -15.5, 169.75),
        (13.79538, -15.5, 169.75),
        (-13.79538, -15.5, 169.75),
        (-20.874626, -15.5, 169.75),
    ]]
    fillet(f17_2_edges, radius=F17_2_R)


solid = Compound([f3_2.part, f4_2.part, f13.part, f15.part])
